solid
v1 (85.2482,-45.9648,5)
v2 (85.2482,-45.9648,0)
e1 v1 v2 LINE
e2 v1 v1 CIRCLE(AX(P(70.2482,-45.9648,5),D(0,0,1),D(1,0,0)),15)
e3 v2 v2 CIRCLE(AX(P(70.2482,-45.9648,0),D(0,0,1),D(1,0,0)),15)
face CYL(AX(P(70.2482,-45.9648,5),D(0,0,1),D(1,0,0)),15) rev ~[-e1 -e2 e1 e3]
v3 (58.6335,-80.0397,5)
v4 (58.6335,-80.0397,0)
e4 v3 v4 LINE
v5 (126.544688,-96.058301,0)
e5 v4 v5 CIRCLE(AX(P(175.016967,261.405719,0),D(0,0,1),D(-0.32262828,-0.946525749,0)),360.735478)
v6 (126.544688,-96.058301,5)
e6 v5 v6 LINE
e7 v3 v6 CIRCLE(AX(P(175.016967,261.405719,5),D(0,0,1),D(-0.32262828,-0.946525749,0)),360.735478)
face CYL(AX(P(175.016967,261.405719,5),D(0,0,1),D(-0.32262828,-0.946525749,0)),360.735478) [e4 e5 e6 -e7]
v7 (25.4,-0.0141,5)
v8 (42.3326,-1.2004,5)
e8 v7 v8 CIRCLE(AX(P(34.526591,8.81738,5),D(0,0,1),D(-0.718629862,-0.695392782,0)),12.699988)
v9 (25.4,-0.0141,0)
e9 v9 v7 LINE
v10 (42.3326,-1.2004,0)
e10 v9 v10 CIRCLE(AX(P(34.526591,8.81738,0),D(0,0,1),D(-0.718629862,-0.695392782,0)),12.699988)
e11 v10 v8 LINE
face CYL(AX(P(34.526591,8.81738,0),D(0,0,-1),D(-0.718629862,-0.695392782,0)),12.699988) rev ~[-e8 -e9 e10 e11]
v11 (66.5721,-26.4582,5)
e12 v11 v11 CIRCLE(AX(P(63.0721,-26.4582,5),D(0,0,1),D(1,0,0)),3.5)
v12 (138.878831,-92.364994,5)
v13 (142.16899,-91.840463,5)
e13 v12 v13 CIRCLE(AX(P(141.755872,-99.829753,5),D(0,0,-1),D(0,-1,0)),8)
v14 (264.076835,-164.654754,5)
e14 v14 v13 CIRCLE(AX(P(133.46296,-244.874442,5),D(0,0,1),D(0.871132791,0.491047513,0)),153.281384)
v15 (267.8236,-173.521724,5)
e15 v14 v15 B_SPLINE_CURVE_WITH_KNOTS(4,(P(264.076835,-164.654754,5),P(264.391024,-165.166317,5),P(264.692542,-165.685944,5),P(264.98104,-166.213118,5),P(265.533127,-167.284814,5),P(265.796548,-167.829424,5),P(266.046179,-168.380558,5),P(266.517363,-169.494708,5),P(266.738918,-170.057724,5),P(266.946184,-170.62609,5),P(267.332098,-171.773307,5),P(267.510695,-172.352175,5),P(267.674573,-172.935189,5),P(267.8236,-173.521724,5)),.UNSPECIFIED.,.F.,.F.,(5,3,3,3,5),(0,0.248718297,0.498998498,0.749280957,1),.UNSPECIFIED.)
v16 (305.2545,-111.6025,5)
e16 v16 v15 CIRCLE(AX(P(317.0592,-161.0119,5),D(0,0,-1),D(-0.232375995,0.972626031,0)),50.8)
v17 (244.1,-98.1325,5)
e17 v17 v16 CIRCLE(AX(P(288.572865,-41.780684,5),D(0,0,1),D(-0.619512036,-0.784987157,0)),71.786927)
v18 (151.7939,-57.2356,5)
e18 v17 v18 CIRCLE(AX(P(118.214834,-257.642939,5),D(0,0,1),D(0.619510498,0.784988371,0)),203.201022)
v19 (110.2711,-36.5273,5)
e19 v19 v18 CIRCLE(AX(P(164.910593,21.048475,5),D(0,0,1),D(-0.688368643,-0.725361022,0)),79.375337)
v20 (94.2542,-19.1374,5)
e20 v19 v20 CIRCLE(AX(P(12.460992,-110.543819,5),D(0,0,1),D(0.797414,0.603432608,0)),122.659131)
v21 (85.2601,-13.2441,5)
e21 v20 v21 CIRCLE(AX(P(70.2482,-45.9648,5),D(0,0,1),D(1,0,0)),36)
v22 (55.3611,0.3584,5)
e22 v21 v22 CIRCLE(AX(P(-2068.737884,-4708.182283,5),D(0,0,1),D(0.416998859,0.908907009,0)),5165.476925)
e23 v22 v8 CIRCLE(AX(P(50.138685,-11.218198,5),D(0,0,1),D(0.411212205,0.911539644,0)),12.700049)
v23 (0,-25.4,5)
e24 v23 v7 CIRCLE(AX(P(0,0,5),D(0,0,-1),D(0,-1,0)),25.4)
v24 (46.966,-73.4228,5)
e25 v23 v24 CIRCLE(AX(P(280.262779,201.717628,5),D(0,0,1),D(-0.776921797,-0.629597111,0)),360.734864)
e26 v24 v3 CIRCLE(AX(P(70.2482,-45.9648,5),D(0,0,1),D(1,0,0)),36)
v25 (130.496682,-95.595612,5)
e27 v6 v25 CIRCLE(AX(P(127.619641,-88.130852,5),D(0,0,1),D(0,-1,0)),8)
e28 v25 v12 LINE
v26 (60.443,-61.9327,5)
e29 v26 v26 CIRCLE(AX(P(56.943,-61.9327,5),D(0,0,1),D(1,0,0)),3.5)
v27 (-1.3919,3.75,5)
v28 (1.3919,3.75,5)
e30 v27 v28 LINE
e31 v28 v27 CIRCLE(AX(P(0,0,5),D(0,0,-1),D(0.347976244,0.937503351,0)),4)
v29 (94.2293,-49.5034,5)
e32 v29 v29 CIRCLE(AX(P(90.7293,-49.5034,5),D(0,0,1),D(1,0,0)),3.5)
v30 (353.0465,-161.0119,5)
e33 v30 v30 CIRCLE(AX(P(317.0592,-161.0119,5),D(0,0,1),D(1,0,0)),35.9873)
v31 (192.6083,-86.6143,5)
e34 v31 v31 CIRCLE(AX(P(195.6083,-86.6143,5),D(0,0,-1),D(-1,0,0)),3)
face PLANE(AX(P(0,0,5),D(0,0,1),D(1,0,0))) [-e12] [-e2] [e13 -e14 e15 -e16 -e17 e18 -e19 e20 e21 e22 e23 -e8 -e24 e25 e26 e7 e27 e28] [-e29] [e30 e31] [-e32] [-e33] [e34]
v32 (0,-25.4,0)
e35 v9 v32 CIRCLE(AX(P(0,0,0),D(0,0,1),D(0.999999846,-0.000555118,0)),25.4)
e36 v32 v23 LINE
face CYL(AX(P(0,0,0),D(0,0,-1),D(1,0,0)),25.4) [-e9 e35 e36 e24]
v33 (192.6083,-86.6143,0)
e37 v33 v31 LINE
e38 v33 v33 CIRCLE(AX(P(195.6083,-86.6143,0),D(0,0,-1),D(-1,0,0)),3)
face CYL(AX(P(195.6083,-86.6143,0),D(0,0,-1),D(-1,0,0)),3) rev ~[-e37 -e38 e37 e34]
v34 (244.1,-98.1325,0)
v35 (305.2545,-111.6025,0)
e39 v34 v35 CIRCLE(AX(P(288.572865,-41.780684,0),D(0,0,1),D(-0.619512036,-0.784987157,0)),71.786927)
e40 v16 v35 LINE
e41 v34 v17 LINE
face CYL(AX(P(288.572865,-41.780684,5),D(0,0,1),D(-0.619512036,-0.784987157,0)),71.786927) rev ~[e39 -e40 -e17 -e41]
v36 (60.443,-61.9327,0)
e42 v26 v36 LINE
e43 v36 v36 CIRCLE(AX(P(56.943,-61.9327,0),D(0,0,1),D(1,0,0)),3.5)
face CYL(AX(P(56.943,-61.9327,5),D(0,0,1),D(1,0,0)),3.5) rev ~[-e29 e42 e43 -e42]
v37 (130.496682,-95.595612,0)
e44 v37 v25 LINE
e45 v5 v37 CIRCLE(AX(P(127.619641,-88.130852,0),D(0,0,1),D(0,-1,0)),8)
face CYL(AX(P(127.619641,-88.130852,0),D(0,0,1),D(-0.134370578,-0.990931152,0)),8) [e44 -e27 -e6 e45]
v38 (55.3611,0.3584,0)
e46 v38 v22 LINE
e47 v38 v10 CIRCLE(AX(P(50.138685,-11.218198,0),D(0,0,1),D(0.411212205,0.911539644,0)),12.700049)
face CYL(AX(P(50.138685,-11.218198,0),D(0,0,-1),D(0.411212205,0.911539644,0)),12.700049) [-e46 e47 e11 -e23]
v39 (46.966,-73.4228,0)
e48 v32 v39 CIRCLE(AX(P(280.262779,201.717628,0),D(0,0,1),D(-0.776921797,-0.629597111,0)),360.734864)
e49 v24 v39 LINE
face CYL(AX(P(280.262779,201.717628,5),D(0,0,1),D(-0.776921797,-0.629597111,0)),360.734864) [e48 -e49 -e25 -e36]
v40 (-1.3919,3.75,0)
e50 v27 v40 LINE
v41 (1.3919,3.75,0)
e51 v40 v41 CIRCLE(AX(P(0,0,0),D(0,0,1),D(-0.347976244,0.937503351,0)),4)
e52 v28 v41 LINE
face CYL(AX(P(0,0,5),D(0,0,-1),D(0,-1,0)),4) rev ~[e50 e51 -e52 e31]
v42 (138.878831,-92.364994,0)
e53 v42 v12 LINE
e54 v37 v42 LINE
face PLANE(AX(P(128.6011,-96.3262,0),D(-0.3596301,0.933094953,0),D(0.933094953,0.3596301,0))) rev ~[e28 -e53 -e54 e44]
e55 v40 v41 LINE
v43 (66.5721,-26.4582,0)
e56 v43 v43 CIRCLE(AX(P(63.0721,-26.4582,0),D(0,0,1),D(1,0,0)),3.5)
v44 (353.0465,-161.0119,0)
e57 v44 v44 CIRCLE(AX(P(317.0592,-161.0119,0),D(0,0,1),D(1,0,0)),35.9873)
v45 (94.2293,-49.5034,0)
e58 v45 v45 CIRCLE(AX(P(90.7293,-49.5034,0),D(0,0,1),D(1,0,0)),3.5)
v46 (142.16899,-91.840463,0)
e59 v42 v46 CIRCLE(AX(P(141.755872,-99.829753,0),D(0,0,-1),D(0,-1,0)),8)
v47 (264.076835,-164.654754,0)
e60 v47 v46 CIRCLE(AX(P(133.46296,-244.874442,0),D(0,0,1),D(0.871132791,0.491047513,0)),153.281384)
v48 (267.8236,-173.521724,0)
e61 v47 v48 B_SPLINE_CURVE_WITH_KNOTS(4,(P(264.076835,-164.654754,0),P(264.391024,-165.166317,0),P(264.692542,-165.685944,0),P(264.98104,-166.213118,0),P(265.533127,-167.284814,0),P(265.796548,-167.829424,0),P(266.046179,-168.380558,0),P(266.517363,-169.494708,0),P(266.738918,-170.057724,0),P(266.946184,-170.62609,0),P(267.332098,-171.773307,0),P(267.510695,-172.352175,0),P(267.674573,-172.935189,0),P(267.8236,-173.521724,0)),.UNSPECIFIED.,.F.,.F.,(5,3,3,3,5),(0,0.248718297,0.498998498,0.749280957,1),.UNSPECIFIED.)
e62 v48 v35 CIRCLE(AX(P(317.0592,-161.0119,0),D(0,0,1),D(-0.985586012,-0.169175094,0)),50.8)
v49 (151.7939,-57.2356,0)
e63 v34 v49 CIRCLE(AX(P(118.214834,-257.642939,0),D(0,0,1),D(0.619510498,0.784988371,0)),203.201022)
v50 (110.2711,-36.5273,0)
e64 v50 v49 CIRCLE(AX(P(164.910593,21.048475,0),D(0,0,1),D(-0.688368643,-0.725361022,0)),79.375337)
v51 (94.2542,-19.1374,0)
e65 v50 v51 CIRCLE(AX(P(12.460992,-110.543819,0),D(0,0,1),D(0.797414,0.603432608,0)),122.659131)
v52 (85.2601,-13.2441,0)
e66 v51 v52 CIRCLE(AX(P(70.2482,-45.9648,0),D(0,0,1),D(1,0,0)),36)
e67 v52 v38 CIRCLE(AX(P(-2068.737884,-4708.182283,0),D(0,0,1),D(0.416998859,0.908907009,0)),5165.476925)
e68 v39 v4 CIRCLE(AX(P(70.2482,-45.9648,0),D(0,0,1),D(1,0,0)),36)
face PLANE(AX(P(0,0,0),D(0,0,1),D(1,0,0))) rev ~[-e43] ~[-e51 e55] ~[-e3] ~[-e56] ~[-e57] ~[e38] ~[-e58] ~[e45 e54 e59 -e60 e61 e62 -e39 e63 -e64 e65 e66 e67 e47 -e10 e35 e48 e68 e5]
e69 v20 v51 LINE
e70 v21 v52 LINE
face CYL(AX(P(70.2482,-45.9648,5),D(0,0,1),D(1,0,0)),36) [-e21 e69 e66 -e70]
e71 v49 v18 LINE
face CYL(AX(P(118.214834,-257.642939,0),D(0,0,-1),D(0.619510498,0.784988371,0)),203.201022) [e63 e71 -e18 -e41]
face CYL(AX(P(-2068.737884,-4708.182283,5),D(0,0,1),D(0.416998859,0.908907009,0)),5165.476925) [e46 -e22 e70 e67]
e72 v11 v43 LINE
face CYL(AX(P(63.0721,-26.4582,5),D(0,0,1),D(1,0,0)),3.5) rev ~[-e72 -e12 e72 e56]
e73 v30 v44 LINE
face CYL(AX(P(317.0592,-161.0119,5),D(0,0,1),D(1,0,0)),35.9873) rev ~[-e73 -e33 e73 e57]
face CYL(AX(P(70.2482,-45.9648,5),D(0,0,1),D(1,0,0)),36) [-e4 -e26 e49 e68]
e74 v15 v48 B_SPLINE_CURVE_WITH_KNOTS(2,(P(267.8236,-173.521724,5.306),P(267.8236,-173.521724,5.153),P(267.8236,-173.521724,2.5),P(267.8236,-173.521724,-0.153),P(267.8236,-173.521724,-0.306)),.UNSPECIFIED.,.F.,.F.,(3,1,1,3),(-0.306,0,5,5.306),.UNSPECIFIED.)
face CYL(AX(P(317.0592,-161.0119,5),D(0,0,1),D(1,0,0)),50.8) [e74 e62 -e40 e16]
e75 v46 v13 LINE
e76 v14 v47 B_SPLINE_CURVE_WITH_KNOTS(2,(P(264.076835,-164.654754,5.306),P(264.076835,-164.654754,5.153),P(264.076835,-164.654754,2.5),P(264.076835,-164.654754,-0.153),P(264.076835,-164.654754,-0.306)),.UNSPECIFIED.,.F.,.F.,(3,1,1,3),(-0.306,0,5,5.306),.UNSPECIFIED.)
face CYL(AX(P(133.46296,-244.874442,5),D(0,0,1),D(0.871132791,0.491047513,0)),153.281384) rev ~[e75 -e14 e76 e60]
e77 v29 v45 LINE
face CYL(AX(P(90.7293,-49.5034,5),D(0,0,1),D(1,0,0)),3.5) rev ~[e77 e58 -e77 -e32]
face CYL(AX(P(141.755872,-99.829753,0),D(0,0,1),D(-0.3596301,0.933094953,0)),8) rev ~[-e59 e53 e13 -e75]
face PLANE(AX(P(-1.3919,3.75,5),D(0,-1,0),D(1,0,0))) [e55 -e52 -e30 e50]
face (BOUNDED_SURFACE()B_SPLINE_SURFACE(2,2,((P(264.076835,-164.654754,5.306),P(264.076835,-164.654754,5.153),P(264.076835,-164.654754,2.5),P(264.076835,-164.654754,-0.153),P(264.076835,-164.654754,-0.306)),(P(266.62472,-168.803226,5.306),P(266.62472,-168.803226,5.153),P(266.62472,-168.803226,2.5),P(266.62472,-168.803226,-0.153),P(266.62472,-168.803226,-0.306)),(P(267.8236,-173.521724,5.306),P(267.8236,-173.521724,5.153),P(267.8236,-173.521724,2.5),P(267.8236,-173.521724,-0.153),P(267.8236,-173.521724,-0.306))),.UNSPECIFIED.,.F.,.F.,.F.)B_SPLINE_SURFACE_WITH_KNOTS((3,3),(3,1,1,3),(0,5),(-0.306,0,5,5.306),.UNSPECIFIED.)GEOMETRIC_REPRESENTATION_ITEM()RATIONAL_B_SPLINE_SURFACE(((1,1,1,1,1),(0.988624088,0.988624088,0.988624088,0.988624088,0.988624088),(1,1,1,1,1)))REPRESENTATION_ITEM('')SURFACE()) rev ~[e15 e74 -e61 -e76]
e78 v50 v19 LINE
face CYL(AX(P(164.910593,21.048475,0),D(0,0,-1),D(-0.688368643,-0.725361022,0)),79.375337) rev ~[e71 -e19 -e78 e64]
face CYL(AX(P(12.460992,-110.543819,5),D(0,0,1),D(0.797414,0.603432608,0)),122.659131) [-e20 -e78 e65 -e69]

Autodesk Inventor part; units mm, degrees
ref_plane "YZ Plane" through (0, 0, 0) normal (1, 0, 0) x (0, 1, 0)
ref_plane "XZ Plane" through (0, 0, 0) normal (0, 1, 0) x (-1, 0, 0)
ref_plane "XY Plane" through (0, 0, 0) normal (0, 0, 1) x (1, 0, 0)
sketch "DShaft" plane through (0, 0, 5) normal (0, 0, 1) x (1, 0, 0)
  circle A0 centre (0, 0) radius 4
  line L0 (-1.3919, 3.75) -> (1.3919, 3.75)
  dimension "d174" = 3.75
sketch "Sketch17" plane through (0, 0, 5) normal (0, 0, 1) x (1, 0, 0)
  arc A0 (55.3611, 0.3584) -> (42.3326, -1.2004) centre (50.1387, -11.2181) ccw
  arc A1 (55.3611, 0.3584) -> (35.2473, 5.0627) centre (33.3341, -48.4687) ccw
  arc A2 (25.4, -0.0141) -> (0, -25.4) centre (0, 0) ccw
  arc A3 (21.8139, 13.0121) -> (35.2473, 5.0627) centre (35.8302, 21.3728) ccw
  arc A4 (85.2601, -13.2441) -> (55.3611, 0.3584) centre (-2070.8473, -4712.7994) ccw
  arc A5 (25.4, -0.0141) -> (42.3326, -1.2004) centre (34.5266, 8.8174) ccw
sketch "Base" plane through (0, 0, 0) normal (0, 0, 1) x (1, 0, 0)
  circle A0 centre (0, 0) radius 25.4
  arc A1 (296.4611, -175.8738) -> (140.4514, -91.7589) centre (131.6761, -294.7694) ccw
  arc A2 (110.2711, -36.5273) -> (55.3611, 0.3584) centre (-26.1088, -180.2356) ccw
  arc A3 (110.2711, -36.5273) -> (151.7939, -57.2356) centre (164.9104, 21.0482) ccw
  arc A4 (244.1, -98.1325) -> (151.7939, -57.2356) centre (118.2154, -257.642) ccw
  arc A5 (244.1, -98.1325) -> (322.9398, -136.302) centre (369.9847, 61.3771) ccw
  arc A6 (339.7063, -172.5127) -> (322.9398, -136.302) centre (317.0592, -161.0119) ccw
  arc A7 (296.4611, -175.8738) -> (339.7063, -172.5127) centre (317.0592, -161.0119) ccw
  line L0 (128.6011, -96.3262) -> (140.4514, -91.7589)
  line L1 (0, 0) -> (317.0592, -161.0119) construction
  circle A8 centre (317.0592, -161.0119) radius 25.4 construction
  arc A9 (0, -25.4) -> (128.6011, -96.3262) centre (153.166, 100.265) ccw
  line L2 (0, 0) -> (0, -25.4) construction
  arc A10 (55.3611, 0.3584) -> (42.3326, -1.2004) centre (50.1387, -11.2181) ccw
  arc A11 (25.4, -0.0141) -> (42.3326, -1.2004) centre (34.5266, 8.8174) ccw
  line L3 (110.2711, -36.5273) -> (102.4101, -52.0068) construction
  line L4 (50.1387, -11.2181) -> (44.3883, -22.5417) construction
  line L5 (140.4514, -91.7589) -> (148.7008, -75.5146) construction
  line L6 (244.1, -98.1325) -> (233.6726, -118.6658) construction
  line L7 (339.7063, -172.5127) -> (317.0592, -161.0119) construction
  dimension "d101" = 50.8
  dimension "d98" = 355.6
  dimension "d99" = 203.2
  dimension "d100" = 79.375
  dimension "d102" = 198.12
  dimension "d103" = 50.8
  dimension "d104" = 12.7
  dimension "d105" = 203.2
  dimension "d106" = 48
  dimension "d107" = 12.7
  dimension "d108" = 12.7
  dimension "d109" = 23.495
  dimension "d111" = 158.75
  dimension "d112" = 222.25
  dimension "d113" = 49.784
  dimension "d114" = 65.0748
  dimension "d115" = 51.9176
  dimension "d116" = 95.3008
  dimension "d117" = 93.5228
extrude "Plate1" add sketch "Base" along normal blind 5
sketch "MountHoles" plane through (0, 0, 5) normal (0, 0, 1) x (1, 0, 0)
  arc A0 (296.4611, -175.8738) -> (322.9398, -136.302) centre (317.0592, -161.0119) ccw projected
  circle A1 centre (317.0592, -161.0119) radius 3.175
  circle A2 centre (0, 0) radius 3.175
  circle A3 centre (0, 0) radius 15.875 construction
  circle A4 centre (0, 15.875) radius 3.175
  line L0 (0, 15.875) -> (0, 0) construction
  circle A5 centre (-13.7482, 7.9375) radius 3.175
  circle A6 centre (-13.7482, -7.9375) radius 3.175
  circle A7 centre (0, -15.875) radius 3.175
  circle A8 centre (13.7482, -7.9375) radius 3.175
  circle A9 centre (13.7482, 7.9375) radius 3.175
  point P0 (278.6053, -195.7416)
  point P1 (14.9365, 6.9557)
  dimension "d40" = 31.75
  dimension "d38" = 6.35
  dimension "d39" = 6.35
  dimension "d43" = 360
hole "MountHolesFeature" at (0, 0, 5) direction (0, 0, -1) diameter 8 end through all
fillet "SmallFilletsFeature" radius 8 2 edges at (140.4514, -91.7589, 2.5) (128.6011, -96.3262, 2.5)
sketch "WheelMountHole" plane through (0, 0, 5) normal (0, 0, 1) x (1, 0, 0)
  arc A0 (296.4611, -175.8738) -> (322.9398, -136.302) centre (317.0592, -161.0119) ccw projected
  circle A1 centre (317.0592, -161.0119) radius 6.35
  point P0 (0, 0)
  point P1 (278.6053, -195.7416)
  dimension "d83" = 12.7
hole "WheelMountHoleFeature" at (317.0592, -161.0119, 5) direction (0, 0, -1) diameter 24.5 end through all
sketch "PistonMountHole" plane through (0, 0, 0) normal (0, 0, -1) x (-1, 0, 0)
  circle A0 centre (-195.6083, -86.6143) radius 3
  arc A1 (-151.7939, -57.2356) -> (-244.1, -98.1325) centre (-118.2154, -257.642) ccw projected
  line L0 (-206.4619, -74.6043) -> (-184.7548, -98.6243) construction
  arc A2 (-142.169, -91.8405) -> (-296.4611, -175.8738) centre (-131.6761, -294.7694) ccw projected
  point P0 (0, 0)
  dimension "d120" = 6
  dimension "d122" = 203.2
extrude "PistonMountHoleFeature" cut sketch "PistonMountHole" against normal blind 5
sketch "MotorExtend" plane through (0, 0, 5) normal (0, 0, 1) x (1, 0, 0)
  circle A0 centre (70.2482, -45.9648) radius 36
  arc A1 (0, -25.4) -> (126.5447, -96.0583) centre (153.166, 100.265) ccw construction
  arc A2 (110.2711, -36.5273) -> (151.7939, -57.2356) centre (164.9104, 21.0482) ccw construction
  circle A3 centre (0, 0) radius 4
  line L0 (0, 0) -> (140.4963, -91.9296) construction
  arc A4 (142.169, -91.8405) -> (138.8789, -92.365) centre (141.7559, -99.8298) ccw
  arc A5 (0, -25.4) -> (46.966, -73.4228) centre (280.2614, 201.7164) ccw
  arc A6 (126.5447, -96.0583) -> (130.4966, -95.5956) centre (127.6196, -88.1308) ccw
  arc A7 (58.6335, -80.0397) -> (126.5447, -96.0583) centre (175.0163, 261.4034) ccw
  arc A8 (55.3611, 0.3584) -> (42.3326, -1.2004) centre (50.1387, -11.2181) ccw
  arc A9 (85.2601, -13.2441) -> (55.3611, 0.3584) centre (-2070.8473, -4712.7994) ccw
  arc A10 (110.2711, -36.5273) -> (55.3611, 0.3584) centre (-26.1088, -180.2356) ccw
  arc A11 (110.2711, -36.5273) -> (94.2542, -19.1374) centre (12.4591, -110.5454) ccw
  line L1 (0, -25.4) -> (55.3611, 0.3584)
  line L2 (110.2711, -36.5273) -> (126.5447, -96.0583)
  point P0 (70.2482, -45.9648)
  dimension "d128" = 72
sheet face with bend "MotorExtendFeature" sketch "MotorExtend" thickness 5 toward (0, 0, -1) bend radius 5 contours A0 A10 | A11 A10 A0 | A0 A10 A9 | A10 L2 A7 A0 | A0 A10 | A0 A5 L1 A10
bend "Bend1"
sketch "MotorCut" plane through (0, 0, 5) normal (0, 0, 1) x (1, 0, 0)
  circle A0 centre (70.2482, -45.9648) radius 36 projected
  circle A1 centre (70.2482, -45.9648) radius 15
  point P0 (0, 0)
  dimension "d134" = 30
extrude "MotorCutFeature" cut sketch "MotorCut" against normal blind 5 contours A1
sketch "MotorMountHoles" plane through (0, 0, 5) normal (0, 0, 1) x (1, 0, 0)
  circle A0 centre (56.943, -61.9327) radius 3.5 projected
  circle A1 centre (63.0721, -26.4582) radius 3.5 projected
  circle A2 centre (90.7293, -49.5034) radius 3.5 projected
  point P0 (0, 0)
extrude "MotorMountHolesFeature" cut sketch "MotorMountHoles" against normal blind 5
sketch "HubCoverExtend" plane through (0, 0, 5) normal (0, 0, 1) x (1, 0, 0)
  circle A0 centre (317.0592, -161.0119) radius 12.25
  circle A1 centre (317.0592, -161.0119) radius 50.8
  arc A2 (244.1, -98.1325) -> (322.9398, -136.302) centre (369.9847, 61.3771) ccw
  arc A3 (296.4611, -175.8738) -> (142.169, -91.8405) centre (131.6761, -294.7694) ccw
  arc A4 (244.1, -98.1325) -> (305.2545, -111.6025) centre (288.573, -41.7804) ccw
  arc A5 (266.9914, -169.606) -> (228.8665, -116.3198) centre (192.9202, -182.3202) ccw
  point P0 (0, 0)
  point P1 (283.7795, -122.6308)
  point P2 (268.8853, -144.8899)
  dimension "d139" = 101.6
sheet face with bend "HubCoverExtendFeature" sketch "HubCoverExtend" thickness 5 toward (0, 0, -1) bend radius 5
bend "Bend2"
sketch "HubPressFitHole" plane through (0, 0, 5) normal (0, 0, 1) x (1, 0, 0)
  circle A0 centre (317.0592, -161.0119) radius 12.25 projected
  circle A1 centre (317.0592, -161.0119) radius 35.9873
  point P0 (0, 0)
  dimension "d145" = 71.9746
extrude "HubPressFitHoleFeature" cut sketch "HubPressFitHole" against normal blind 5 contours A0 | A1
sketch "ShinThicken" plane through (0, 0, 5) normal (0, 0, 1) x (1, 0, 0)
  arc A0 (266.9914, -169.606) -> (228.8665, -116.3198) centre (192.9202, -182.3202) ccw
  arc A1 (228.8665, -116.3198) -> (142.169, -91.8405) centre (131.6761, -294.7694) ccw
  arc A2 (266.9914, -169.606) -> (142.169, -91.8405) centre (133.4629, -244.8745) ccw
  point P0 (0, 0)
sheet face with bend "ShinThickenFeature" sketch "ShinThicken" thickness 5 toward (0, 0, -1) bend radius 5
bend "Bend3"
fillet "BlendFilletFeature" radius 32 1 edges at (266.9914, -169.606, 2.5)
sheet face with bend "DShaftFeature" sketch "DShaft" thickness 5 toward (0, 0, -1) bend radius 5 picked at (-0.1576, 3.824) contours L0 A0
bend "Bend6"
equation "\"d66\" = Thickness"
equation "\"d89\" = Thickness"
equation "\"d37\" = Thickness"
equation "\"BendRadius\" = Thickness"
equation "\"BendReliefWidth\" = Thickness"
equation "\"BendReliefDepth\" = 0.5 * Thickness"
equation "\"TransitionRadius\" = BendRadius"
equation "\"JacobiRadiusSize\" = BendRadius"
equation "\"GapSize\" = Thickness"
equation "\"Thickness\" = 5"
properties part number "LowerLeg"
